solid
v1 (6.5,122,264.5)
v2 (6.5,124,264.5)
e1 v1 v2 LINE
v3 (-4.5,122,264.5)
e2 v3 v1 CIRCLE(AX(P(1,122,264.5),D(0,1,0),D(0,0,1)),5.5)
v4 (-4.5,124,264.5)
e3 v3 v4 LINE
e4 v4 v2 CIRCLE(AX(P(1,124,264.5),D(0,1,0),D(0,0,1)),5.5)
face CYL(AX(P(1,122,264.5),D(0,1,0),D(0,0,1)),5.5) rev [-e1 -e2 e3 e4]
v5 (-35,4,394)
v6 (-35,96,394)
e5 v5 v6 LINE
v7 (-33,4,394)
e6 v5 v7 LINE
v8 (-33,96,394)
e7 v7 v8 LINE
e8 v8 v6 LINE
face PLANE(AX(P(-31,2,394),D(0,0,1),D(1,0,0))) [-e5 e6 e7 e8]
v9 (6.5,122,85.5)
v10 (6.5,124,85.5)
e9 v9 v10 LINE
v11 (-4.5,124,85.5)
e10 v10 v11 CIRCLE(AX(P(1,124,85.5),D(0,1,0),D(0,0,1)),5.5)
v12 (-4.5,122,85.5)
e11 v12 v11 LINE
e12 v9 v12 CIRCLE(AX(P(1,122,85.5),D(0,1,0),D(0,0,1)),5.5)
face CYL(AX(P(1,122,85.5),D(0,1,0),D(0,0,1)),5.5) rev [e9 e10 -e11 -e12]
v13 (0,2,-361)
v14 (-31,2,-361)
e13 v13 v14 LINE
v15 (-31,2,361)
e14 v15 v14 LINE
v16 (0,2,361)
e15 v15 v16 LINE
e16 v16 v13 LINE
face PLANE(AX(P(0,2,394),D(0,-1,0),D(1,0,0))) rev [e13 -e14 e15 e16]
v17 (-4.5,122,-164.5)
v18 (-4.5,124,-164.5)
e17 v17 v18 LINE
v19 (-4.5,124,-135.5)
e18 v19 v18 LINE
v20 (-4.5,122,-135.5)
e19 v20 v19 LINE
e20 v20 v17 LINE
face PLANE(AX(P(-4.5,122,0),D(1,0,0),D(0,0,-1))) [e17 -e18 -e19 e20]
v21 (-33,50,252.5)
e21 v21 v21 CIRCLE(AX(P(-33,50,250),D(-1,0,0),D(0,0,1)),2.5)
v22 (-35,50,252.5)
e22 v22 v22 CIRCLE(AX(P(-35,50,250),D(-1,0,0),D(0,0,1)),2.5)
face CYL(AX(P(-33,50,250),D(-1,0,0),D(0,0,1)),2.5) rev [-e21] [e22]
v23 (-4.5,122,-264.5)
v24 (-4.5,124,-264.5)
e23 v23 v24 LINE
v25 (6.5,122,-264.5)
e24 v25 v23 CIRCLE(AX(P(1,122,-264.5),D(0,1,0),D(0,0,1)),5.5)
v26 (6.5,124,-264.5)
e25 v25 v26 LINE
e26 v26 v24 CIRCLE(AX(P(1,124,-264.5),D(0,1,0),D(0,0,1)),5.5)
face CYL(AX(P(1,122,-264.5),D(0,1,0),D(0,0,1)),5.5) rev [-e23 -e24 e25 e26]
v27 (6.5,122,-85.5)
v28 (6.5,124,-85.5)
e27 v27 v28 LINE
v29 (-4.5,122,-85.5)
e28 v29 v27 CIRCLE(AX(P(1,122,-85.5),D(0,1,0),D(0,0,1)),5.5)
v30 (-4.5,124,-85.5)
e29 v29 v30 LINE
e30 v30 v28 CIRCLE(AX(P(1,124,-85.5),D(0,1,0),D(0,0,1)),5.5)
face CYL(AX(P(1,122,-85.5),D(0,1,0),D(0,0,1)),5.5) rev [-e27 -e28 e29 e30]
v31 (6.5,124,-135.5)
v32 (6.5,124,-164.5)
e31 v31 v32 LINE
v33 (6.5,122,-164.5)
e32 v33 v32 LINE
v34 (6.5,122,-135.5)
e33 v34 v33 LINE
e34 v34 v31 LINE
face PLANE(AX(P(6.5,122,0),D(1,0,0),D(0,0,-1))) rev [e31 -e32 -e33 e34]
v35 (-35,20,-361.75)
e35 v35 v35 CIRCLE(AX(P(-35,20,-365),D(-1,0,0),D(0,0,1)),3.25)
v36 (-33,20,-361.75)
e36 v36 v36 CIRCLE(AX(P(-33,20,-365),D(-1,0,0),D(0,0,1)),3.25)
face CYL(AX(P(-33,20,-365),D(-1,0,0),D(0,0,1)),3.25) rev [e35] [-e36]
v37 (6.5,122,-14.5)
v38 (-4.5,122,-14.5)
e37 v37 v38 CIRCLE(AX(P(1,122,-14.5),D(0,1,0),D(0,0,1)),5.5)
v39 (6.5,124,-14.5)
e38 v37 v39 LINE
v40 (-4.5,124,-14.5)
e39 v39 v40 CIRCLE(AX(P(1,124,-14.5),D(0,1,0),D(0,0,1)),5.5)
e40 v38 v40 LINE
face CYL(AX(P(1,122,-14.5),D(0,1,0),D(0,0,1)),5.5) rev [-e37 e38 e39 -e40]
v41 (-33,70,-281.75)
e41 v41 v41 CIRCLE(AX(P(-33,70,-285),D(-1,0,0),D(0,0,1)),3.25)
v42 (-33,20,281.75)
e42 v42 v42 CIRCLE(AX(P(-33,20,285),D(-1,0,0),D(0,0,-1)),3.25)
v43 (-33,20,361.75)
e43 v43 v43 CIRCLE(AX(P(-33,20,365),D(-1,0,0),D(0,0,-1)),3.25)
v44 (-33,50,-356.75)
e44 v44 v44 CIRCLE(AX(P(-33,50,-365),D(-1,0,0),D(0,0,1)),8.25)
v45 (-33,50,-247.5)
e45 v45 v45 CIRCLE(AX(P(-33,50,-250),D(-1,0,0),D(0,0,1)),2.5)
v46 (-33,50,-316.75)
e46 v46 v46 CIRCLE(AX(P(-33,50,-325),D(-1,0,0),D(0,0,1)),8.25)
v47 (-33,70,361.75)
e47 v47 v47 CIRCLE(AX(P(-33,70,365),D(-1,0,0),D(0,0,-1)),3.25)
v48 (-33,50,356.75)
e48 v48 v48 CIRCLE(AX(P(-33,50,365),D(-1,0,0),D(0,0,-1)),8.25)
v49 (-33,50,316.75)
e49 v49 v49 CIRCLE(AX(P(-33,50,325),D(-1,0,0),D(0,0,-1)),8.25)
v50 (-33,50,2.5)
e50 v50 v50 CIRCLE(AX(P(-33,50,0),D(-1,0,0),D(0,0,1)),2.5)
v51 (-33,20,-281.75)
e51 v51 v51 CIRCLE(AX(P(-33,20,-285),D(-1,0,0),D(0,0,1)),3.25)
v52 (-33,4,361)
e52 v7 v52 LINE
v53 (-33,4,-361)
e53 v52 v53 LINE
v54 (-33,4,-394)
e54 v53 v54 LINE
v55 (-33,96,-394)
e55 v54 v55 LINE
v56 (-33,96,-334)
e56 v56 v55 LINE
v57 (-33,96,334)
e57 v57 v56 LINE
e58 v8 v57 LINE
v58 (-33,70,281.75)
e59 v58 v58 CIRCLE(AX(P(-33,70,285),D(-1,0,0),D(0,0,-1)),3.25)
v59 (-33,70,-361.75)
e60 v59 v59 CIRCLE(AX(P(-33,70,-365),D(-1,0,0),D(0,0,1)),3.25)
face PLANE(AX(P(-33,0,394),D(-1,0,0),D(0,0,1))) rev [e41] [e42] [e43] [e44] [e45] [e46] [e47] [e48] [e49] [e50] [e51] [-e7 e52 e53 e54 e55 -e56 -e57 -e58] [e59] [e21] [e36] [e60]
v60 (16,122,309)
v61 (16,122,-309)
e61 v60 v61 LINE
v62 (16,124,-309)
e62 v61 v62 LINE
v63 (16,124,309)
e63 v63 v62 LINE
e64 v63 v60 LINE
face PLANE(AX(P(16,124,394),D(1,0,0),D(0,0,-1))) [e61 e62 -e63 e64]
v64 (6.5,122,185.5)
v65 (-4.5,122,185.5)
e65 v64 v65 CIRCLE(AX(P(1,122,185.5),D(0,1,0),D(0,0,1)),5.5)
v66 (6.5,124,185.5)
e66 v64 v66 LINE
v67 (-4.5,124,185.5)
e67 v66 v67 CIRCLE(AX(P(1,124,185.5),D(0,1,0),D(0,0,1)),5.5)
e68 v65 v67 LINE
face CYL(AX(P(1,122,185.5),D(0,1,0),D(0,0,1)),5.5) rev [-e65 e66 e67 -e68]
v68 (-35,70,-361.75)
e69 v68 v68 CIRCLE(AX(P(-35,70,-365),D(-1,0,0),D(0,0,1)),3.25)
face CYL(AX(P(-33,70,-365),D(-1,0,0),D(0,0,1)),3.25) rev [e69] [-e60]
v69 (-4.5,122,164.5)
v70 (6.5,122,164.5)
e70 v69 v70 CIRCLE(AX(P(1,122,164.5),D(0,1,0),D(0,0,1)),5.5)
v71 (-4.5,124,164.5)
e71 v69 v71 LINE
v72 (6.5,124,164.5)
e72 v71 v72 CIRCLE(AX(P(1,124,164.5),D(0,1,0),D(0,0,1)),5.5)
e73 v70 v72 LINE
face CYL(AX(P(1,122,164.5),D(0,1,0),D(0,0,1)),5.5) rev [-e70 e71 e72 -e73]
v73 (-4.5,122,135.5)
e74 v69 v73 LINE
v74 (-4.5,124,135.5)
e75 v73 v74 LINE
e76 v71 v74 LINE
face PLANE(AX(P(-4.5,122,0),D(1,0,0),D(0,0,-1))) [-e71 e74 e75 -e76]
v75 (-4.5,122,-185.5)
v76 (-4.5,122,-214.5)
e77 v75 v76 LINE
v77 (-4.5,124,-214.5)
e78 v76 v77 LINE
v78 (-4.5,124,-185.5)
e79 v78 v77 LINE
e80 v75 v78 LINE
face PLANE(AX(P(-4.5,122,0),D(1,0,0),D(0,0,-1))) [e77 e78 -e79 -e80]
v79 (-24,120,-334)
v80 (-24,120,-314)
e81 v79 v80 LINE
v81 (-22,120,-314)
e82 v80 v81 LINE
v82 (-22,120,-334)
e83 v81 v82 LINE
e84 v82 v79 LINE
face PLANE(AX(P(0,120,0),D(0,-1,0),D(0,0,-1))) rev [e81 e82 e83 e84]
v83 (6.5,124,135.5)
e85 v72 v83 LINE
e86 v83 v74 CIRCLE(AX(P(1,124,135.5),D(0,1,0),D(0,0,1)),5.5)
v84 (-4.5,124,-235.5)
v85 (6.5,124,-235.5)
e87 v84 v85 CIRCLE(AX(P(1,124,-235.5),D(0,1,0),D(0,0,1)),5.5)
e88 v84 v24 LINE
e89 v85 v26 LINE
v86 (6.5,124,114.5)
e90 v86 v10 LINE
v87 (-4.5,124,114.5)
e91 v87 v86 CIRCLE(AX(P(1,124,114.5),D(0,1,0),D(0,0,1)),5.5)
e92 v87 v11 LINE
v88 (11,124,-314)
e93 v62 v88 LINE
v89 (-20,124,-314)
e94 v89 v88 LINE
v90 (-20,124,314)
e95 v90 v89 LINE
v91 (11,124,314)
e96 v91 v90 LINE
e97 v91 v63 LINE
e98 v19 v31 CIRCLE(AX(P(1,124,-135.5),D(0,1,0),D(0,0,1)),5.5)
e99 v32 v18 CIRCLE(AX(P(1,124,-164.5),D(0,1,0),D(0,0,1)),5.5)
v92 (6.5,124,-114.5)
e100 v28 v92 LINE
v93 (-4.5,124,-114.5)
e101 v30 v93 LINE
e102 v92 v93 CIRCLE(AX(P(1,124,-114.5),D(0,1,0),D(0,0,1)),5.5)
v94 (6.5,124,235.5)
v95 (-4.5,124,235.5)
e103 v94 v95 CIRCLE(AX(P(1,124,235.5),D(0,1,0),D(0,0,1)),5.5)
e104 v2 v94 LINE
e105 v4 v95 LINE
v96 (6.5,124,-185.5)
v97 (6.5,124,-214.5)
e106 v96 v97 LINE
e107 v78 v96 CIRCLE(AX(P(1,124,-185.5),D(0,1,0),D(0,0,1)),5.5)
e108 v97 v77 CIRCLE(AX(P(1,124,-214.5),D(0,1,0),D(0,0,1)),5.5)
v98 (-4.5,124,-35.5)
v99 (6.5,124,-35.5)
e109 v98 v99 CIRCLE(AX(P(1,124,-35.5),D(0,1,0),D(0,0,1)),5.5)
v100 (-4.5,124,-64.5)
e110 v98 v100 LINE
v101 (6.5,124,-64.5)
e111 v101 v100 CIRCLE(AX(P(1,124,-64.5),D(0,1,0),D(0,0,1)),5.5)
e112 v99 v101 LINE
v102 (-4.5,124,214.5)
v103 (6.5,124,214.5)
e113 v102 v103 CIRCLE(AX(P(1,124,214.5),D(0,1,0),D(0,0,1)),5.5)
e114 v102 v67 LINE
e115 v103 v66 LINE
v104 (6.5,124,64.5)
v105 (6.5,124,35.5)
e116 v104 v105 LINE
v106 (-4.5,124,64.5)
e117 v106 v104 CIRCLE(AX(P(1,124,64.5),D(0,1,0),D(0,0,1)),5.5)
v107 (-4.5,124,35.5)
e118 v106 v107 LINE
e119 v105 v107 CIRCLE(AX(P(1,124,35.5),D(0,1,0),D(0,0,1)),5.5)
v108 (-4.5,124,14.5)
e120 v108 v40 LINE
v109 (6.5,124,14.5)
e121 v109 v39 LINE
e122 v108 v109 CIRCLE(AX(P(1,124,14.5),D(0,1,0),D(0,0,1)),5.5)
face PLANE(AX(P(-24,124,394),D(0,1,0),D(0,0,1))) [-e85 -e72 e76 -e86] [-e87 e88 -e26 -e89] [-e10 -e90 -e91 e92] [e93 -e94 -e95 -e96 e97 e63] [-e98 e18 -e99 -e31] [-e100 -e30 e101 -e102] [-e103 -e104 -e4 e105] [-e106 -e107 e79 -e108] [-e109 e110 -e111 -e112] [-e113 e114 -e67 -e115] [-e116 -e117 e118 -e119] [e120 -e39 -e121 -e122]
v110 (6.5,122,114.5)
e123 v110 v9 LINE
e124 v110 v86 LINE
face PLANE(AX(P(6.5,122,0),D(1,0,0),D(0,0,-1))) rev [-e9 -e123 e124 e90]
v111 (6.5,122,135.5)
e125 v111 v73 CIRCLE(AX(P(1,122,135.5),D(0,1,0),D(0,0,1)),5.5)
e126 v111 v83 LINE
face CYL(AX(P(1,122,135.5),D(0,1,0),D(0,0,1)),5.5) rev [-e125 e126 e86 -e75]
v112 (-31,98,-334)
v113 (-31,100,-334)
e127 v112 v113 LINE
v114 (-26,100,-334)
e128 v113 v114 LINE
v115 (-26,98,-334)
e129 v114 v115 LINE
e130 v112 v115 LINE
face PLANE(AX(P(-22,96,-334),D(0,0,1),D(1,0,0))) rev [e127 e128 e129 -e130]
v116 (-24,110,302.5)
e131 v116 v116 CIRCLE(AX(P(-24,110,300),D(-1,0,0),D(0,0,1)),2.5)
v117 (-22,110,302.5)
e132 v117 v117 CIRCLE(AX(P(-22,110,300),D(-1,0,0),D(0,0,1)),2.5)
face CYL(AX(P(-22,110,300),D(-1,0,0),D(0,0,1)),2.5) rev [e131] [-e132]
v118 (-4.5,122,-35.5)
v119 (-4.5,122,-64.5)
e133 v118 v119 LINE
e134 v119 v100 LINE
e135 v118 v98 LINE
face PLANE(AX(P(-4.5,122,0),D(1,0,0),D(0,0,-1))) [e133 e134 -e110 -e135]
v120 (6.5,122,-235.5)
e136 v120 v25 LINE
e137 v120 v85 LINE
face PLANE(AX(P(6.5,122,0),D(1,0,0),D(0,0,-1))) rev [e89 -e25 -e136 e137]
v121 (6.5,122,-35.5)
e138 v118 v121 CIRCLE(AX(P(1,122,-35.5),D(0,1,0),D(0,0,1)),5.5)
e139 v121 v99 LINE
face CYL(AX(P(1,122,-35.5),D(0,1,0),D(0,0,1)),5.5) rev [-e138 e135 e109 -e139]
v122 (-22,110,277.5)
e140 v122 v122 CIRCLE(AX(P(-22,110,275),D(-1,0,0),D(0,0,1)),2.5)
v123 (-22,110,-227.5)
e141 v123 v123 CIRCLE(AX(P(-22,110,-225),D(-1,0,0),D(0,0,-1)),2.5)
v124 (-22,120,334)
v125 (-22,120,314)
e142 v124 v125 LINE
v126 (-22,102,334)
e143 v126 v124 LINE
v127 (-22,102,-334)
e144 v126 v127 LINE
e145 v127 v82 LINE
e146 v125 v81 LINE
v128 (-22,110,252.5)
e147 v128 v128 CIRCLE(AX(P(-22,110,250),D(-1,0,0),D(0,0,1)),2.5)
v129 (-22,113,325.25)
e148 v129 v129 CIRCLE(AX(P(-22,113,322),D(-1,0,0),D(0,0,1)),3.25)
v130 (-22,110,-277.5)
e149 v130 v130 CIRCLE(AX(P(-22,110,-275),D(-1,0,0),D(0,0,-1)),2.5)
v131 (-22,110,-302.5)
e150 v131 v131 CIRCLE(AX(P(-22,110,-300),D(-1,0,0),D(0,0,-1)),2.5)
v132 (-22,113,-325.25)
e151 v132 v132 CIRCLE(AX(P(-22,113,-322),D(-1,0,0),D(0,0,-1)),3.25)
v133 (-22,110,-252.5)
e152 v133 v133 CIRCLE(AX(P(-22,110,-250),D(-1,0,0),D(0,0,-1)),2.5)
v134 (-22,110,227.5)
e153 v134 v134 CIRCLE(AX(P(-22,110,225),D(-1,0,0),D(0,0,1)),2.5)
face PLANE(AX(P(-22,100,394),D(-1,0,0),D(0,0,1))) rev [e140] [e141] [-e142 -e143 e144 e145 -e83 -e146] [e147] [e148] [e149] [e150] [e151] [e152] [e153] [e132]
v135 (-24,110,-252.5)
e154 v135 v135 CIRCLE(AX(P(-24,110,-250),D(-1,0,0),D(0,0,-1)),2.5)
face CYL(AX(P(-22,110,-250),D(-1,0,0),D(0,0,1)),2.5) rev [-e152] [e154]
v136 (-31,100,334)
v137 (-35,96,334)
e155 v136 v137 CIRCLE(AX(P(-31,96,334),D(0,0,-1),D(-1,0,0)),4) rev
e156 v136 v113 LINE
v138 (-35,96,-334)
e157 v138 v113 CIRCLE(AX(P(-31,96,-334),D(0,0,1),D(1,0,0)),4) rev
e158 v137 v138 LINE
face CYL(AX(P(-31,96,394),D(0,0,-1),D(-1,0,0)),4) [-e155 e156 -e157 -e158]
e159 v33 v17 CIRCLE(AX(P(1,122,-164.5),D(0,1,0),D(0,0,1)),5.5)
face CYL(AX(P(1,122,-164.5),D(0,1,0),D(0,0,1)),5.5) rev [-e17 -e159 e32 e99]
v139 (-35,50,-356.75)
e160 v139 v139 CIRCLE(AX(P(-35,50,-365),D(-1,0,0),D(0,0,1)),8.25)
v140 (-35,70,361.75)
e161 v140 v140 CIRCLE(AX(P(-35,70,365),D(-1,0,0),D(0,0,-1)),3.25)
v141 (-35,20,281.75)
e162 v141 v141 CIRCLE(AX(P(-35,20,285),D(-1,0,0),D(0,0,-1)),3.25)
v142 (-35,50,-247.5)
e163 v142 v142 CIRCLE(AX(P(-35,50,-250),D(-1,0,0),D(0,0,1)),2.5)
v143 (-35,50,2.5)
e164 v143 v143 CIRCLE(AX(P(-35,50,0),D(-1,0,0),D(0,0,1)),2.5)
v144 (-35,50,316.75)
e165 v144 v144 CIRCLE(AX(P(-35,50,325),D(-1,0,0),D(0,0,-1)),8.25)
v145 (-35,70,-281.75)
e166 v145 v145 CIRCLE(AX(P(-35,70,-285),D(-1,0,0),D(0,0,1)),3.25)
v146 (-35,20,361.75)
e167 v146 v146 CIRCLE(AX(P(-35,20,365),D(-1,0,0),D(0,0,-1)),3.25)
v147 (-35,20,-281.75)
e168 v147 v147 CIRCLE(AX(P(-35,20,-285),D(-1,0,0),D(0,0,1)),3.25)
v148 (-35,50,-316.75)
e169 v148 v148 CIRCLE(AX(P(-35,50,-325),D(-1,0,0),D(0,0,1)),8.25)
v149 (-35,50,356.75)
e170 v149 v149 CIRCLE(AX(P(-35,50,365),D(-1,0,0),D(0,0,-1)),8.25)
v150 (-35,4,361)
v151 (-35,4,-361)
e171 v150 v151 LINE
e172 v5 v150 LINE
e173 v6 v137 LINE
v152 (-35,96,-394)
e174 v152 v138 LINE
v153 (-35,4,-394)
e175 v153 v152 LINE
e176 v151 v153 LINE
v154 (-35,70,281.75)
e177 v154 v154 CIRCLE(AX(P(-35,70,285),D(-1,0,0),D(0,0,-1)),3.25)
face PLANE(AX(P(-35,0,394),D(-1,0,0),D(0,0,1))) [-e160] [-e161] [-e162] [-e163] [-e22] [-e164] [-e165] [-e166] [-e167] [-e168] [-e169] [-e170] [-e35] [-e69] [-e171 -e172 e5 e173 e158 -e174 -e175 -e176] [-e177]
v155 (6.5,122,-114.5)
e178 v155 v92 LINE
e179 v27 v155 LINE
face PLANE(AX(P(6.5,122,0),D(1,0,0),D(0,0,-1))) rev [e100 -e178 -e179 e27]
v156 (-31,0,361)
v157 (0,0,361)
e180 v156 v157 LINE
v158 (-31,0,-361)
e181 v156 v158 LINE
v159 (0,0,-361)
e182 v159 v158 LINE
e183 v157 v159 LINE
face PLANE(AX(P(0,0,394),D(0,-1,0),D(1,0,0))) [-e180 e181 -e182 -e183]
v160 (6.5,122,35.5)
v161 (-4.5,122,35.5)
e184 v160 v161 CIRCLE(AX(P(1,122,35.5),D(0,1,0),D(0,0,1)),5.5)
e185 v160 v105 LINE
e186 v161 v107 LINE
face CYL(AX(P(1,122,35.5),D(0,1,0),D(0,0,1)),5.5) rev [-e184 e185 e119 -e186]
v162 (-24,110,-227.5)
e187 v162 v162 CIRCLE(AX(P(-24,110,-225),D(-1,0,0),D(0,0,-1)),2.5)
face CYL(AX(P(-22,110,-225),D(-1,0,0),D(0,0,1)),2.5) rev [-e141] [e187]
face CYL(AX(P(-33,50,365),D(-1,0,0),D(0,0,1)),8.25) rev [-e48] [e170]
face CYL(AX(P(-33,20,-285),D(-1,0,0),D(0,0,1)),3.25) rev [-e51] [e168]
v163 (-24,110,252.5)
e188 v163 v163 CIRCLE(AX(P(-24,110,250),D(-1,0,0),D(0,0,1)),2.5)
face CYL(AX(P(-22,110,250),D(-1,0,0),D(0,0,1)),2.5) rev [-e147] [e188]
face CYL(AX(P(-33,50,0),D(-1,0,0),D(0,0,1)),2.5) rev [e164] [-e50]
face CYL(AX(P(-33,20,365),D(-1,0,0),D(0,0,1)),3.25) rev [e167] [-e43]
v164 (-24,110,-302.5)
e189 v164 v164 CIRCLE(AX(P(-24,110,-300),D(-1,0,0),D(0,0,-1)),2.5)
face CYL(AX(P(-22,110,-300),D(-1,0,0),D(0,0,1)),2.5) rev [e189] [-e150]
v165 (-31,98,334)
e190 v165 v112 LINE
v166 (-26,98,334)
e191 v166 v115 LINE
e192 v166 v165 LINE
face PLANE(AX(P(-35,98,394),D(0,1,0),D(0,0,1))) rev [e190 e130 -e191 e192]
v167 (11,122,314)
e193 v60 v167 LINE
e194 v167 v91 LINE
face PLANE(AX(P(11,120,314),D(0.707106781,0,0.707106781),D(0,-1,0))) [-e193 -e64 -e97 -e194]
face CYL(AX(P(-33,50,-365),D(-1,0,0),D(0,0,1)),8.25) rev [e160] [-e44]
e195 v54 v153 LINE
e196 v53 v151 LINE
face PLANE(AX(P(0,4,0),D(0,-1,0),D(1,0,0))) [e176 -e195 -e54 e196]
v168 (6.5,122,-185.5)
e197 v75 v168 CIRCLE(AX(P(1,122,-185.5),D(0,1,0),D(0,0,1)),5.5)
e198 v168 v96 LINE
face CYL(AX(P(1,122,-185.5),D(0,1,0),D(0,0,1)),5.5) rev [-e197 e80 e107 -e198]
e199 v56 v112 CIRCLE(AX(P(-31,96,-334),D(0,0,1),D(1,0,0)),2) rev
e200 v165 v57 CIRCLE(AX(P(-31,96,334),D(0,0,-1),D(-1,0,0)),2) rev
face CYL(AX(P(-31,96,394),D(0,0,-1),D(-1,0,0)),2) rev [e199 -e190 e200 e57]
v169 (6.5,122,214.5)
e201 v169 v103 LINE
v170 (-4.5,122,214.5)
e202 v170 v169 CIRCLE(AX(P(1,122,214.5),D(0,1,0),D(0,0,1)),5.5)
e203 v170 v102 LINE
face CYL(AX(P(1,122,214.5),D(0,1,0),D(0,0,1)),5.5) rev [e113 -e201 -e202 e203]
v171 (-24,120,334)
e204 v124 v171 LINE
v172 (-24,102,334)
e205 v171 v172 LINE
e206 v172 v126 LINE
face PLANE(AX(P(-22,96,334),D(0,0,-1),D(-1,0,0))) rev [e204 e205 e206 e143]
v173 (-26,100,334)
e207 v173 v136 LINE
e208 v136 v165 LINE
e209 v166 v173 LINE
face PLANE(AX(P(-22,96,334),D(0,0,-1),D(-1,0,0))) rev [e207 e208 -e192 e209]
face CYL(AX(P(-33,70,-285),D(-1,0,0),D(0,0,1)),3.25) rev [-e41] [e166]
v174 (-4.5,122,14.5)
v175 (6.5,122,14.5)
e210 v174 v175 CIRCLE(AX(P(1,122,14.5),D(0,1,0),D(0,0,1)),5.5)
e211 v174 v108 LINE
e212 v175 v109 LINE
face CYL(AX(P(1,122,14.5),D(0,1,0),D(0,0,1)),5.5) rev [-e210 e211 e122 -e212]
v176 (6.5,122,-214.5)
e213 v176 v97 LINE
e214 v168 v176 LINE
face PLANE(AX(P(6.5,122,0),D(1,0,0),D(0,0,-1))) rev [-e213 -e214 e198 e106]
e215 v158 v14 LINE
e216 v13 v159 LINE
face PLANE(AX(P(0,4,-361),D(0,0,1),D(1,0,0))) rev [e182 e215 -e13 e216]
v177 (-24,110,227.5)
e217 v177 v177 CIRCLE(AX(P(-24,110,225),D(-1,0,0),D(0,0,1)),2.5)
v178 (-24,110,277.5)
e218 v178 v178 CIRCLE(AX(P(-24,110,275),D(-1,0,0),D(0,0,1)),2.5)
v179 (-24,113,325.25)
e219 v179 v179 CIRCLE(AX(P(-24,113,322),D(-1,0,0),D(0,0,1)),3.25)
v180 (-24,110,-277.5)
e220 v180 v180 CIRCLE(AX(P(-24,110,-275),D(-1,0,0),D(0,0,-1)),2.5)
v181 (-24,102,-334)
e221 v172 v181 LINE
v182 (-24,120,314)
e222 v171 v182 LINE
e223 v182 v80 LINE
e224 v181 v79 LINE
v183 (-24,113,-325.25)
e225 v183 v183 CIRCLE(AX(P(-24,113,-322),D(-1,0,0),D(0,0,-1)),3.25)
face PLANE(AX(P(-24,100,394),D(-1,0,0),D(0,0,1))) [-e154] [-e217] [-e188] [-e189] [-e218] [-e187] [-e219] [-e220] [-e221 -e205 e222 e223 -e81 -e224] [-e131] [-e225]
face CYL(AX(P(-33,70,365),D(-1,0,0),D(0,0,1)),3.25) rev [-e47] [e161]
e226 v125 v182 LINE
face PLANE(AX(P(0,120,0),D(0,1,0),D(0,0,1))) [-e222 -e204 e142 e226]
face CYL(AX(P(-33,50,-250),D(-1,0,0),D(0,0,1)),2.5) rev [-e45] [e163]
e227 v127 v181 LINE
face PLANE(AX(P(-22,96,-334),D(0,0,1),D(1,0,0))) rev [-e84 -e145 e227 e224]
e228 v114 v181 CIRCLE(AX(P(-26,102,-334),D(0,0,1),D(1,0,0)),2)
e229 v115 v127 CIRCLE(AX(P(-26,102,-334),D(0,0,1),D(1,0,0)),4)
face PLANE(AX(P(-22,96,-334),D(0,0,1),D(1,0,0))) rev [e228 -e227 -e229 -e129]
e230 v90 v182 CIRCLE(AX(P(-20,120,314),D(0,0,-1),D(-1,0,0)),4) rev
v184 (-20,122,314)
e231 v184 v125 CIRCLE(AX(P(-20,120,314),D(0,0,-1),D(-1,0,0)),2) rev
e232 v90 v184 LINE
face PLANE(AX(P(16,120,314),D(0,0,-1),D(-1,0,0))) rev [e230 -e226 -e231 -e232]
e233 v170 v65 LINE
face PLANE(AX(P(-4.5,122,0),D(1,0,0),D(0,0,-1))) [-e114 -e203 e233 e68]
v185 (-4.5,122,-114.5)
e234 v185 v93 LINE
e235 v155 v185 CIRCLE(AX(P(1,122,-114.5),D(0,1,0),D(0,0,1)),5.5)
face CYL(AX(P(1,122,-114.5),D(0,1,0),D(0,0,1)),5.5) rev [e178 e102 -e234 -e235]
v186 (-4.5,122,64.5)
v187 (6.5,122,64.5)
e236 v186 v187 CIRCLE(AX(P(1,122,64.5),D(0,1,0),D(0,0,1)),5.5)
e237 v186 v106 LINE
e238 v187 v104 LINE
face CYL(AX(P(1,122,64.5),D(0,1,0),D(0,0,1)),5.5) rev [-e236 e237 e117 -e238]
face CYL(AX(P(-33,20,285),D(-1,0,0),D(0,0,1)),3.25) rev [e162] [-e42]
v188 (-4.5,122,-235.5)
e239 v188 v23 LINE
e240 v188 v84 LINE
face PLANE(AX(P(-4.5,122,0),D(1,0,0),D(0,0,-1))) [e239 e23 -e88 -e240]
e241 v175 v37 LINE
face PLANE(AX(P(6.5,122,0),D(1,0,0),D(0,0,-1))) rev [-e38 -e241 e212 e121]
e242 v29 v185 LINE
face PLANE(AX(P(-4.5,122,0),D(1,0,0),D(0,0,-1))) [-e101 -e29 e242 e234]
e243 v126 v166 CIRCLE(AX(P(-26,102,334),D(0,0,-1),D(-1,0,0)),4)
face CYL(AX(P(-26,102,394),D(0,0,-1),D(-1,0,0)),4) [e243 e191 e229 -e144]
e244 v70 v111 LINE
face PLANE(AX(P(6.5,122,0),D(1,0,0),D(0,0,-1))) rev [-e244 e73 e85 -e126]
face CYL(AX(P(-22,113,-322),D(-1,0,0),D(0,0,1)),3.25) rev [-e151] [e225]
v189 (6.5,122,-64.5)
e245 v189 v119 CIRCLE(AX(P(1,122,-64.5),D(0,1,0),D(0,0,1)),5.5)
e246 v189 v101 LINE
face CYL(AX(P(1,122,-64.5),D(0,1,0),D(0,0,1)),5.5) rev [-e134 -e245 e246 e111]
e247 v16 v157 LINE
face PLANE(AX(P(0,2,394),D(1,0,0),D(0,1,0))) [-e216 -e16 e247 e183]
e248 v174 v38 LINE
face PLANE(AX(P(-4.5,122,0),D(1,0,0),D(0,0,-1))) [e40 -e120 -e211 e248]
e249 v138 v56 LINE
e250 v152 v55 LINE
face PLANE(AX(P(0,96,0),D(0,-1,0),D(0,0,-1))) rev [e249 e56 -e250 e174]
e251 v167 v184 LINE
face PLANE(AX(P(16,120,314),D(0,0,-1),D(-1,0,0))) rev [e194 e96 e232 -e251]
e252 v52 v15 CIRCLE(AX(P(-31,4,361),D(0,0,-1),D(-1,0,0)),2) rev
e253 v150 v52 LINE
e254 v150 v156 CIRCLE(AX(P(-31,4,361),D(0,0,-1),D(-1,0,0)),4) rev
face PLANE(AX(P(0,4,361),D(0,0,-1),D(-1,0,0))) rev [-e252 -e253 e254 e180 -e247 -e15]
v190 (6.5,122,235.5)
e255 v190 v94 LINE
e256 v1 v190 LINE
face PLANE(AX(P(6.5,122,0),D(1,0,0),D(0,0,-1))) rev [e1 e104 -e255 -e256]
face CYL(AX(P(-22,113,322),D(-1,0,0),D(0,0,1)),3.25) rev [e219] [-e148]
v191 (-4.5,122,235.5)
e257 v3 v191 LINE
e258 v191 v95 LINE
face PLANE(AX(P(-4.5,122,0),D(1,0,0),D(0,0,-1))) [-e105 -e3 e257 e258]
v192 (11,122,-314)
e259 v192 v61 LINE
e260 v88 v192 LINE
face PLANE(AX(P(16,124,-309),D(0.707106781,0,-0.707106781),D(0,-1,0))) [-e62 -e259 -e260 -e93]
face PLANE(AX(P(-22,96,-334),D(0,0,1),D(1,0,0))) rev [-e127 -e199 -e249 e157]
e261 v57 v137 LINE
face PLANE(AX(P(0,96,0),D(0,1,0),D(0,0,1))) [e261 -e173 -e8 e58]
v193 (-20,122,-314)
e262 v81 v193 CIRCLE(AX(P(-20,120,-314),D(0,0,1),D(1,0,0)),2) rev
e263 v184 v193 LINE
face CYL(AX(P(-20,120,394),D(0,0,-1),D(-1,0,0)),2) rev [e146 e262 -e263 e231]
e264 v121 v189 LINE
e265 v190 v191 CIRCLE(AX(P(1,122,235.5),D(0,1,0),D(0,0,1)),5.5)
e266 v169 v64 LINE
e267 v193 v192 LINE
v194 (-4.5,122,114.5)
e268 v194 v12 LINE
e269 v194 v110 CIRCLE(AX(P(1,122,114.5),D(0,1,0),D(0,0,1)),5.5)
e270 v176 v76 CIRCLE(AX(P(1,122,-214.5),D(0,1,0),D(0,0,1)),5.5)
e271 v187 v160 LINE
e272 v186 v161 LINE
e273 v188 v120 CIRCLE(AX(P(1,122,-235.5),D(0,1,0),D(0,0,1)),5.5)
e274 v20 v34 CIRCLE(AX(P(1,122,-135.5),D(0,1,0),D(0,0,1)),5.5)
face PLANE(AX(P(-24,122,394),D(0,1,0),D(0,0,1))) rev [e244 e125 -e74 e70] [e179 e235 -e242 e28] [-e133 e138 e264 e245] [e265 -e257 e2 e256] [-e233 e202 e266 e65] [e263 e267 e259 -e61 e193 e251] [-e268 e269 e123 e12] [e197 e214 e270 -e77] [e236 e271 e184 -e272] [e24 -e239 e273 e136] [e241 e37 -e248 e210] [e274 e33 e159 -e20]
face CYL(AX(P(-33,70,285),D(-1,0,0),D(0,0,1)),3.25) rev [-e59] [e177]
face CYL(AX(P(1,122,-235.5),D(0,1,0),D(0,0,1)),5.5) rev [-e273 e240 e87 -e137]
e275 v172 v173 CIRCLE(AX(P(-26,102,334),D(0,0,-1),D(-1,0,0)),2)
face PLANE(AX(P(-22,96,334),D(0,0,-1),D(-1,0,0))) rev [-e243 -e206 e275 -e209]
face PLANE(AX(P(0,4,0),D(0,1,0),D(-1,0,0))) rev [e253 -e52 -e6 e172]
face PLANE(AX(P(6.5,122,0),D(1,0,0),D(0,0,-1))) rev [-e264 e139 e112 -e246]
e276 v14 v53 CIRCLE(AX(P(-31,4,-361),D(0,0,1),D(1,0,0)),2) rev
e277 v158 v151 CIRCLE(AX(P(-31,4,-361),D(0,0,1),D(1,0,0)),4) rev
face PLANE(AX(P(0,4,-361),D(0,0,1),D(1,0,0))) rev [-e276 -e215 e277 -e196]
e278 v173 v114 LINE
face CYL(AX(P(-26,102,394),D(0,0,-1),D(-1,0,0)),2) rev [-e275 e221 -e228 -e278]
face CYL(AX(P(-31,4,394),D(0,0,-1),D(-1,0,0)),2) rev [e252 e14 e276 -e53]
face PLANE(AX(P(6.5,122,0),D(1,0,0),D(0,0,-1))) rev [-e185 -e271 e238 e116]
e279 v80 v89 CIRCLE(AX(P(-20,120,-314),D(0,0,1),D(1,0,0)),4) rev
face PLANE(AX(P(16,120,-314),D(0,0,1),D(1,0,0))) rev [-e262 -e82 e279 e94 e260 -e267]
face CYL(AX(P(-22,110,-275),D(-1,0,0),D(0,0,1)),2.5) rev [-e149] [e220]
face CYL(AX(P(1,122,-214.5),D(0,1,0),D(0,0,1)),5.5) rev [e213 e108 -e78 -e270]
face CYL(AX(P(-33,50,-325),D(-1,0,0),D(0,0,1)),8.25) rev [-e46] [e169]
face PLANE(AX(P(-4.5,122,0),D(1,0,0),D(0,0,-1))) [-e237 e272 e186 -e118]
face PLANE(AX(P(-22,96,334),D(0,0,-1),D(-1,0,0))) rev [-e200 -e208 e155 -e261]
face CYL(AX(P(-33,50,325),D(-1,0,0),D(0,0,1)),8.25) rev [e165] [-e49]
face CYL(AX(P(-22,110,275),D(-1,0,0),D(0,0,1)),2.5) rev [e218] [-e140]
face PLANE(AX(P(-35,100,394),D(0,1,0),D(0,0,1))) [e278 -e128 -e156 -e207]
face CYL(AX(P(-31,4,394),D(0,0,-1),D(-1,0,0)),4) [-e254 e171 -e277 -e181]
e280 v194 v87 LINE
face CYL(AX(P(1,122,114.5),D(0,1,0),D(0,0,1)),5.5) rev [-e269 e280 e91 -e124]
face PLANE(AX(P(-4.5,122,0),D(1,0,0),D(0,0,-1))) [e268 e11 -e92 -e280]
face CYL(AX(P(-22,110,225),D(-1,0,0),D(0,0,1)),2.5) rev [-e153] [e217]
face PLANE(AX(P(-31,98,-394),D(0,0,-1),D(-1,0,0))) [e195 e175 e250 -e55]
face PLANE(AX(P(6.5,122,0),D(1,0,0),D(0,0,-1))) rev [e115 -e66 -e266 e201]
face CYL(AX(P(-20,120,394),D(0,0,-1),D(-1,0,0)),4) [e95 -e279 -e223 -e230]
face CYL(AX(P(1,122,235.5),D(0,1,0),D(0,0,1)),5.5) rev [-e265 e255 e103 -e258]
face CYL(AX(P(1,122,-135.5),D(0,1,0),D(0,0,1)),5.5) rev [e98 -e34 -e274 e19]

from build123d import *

# Parameters (mm, degrees)
SM_BASE_FLANGE_1_DEPTH = 394
SKETCH_6_W             = 40
SKETCH_6_H             = 80
CUT_EXTRUDE_1_DEPTH    = 4
SKETCH_8_W             = 13
SKETCH_8_H             = 60
CUT_EXTRUDE_2_DEPTH    = 24
SKETCH_9_W             = 35
SKETCH_9_H             = 33
CUT_EXTRUDE_3_DEPTH    = 4
SKETCH_10_R            = 8.25
SKETCH_10_R_2          = 3.25
SKETCH_10_R_3          = 2.5
CUT_EXTRUDE_4_DEPTH    = 10
SKETCH_11_R            = 2.5
SKETCH_11_R_2          = 3.25
CUT_EXTRUDE_5_DEPTH    = 10
CUT_EXTRUDE_6_DEPTH    = 10
OTHER_START            = 229.809703886
OTHER_1_OUTLINE_W      = 445.809703886
OTHER_1_OUTLINE_H      = 4
OTHER_1_DEPTH          = 3.535533906
OTHER_START_2          = -214.2533547
OTHER_1_2_OUTLINE_W    = 4.190296114
OTHER_1_2_OUTLINE_H    = 4
OTHER_1_2_DEPTH        = 7.071067812


# Read off the part's stored shape, not the designer's step: Затупленный угол1
# Sheet-metal steps are written as plain solids
with BuildPart() as part:
    # Sketch 1 → Sm Base Flange 1 (new, symmetric)
    with BuildSketch(Plane.XY):
        with BuildLine():
            Line((0, 0), (-31, 0))
            ThreePointArc((-31, 0), (-33.828427125, 1.171572875), (-35, 4))
            Line((-35, 4), (-35, 96))
            ThreePointArc((-35, 96), (-33.828427125, 98.828427125), (-31, 100))
            Line((-31, 100), (-26, 100))
            ThreePointArc((-26, 100), (-24.585786438, 100.585786438), (-24, 102))
            Line((-24, 102), (-24, 120))
            ThreePointArc((-24, 120), (-22.828427125, 122.828427125), (-20, 124))
            Line((-20, 124), (16, 124))
            Line((16, 124), (16, 122))
            Line((16, 122), (-20, 122))
            ThreePointArc((-20, 122), (-21.414213562, 121.414213562), (-22, 120))
            Line((-22, 120), (-22, 102))
            ThreePointArc((-22, 102), (-23.171572875, 99.171572875), (-26, 98))
            Line((-26, 98), (-31, 98))
            ThreePointArc((-31, 98), (-32.414213562, 97.414213562), (-33, 96))
            Line((-33, 96), (-33, 4))
            ThreePointArc((-33, 4), (-32.414213562, 2.585786438), (-31, 2))
            Line((-31, 2), (0, 2))
            Line((0, 2), (0, 0))
        make_face()
    extrude(amount=SM_BASE_FLANGE_1_DEPTH, both=True)

    # Эскиз6 → Вырез-Вытянуть1 (cut)
    with BuildSketch(Plane(origin=(0, 124, 0), x_dir=(1, 0, 0), z_dir=(0, 1, 0))):
        with Locations((-4, -354)):
            Rectangle(SKETCH_6_W, SKETCH_6_H)
        with Locations((-4, 354)):
            Rectangle(SKETCH_6_W, SKETCH_6_H)
    extrude(amount=-CUT_EXTRUDE_1_DEPTH, mode=Mode.SUBTRACT)

    # Эскиз8 → Вырез-Вытянуть2 (cut)
    with BuildSketch(Plane(origin=(0, 120, 0), x_dir=(1, 0, 0), z_dir=(0, 1, 0))):
        with Locations((-28.5, 364)):
            Rectangle(SKETCH_8_W, SKETCH_8_H)
        with Locations((-28.5, -364)):
            Rectangle(SKETCH_8_W, SKETCH_8_H)
    extrude(amount=-CUT_EXTRUDE_2_DEPTH, mode=Mode.SUBTRACT)

    # Эскиз9 → Вырез-Вытянуть3 (cut)
    with BuildSketch(Plane.XZ):
        with Locations((-17.5, -377.5)):
            Rectangle(SKETCH_9_W, SKETCH_9_H)
        with Locations((-17.5, 377.5)):
            Rectangle(SKETCH_9_W, SKETCH_9_H)
    extrude(amount=-CUT_EXTRUDE_3_DEPTH, mode=Mode.SUBTRACT)

    # Эскиз10 → Вырез-Вытянуть4 (cut)
    with BuildSketch(Plane.ZY.offset(35)):
        with Locations((-365, 50)):
            Circle(SKETCH_10_R)
        with Locations((-365, 20)):
            Circle(SKETCH_10_R_2)
        with Locations((-365, 70)):
            Circle(SKETCH_10_R_2)
        with Locations((-285, 20)):
            Circle(SKETCH_10_R_2)
        with Locations((-285, 70)):
            Circle(SKETCH_10_R_2)
        with Locations((-325, 50)):
            Circle(SKETCH_10_R)
        with Locations(Location((325, 50, 0), (0, 0, 180))):
            Circle(SKETCH_10_R)
        with Locations(Location((285, 70, 0), (0, 0, 180))):
            Circle(SKETCH_10_R_2)
        with Locations(Location((285, 20, 0), (0, 0, 180))):
            Circle(SKETCH_10_R_2)
        with Locations(Location((365, 70, 0), (0, 0, 180))):
            Circle(SKETCH_10_R_2)
        with Locations(Location((365, 20, 0), (0, 0, 180))):
            Circle(SKETCH_10_R_2)
        with Locations(Location((365, 50, 0), (0, 0, 180))):
            Circle(SKETCH_10_R)
        with Locations((-250, 50)):
            Circle(SKETCH_10_R_3)
        with Locations((0, 50)):
            Circle(SKETCH_10_R_3)
        with Locations((250, 50)):
            Circle(SKETCH_10_R_3)
    extrude(amount=-CUT_EXTRUDE_4_DEPTH, mode=Mode.SUBTRACT)

    # Эскиз11 → Вырез-Вытянуть5 (cut)
    with BuildSketch(Plane.ZY.offset(24)):
        with Locations((300, 110)):
            Circle(SKETCH_11_R)
        with Locations((275, 110)):
            Circle(SKETCH_11_R)
        with Locations((250, 110)):
            Circle(SKETCH_11_R)
        with Locations((225, 110)):
            Circle(SKETCH_11_R)
        with Locations((322, 113)):
            Circle(SKETCH_11_R_2)
        with Locations(Location((-322, 113, 0), (0, 0, 180))):
            Circle(SKETCH_11_R_2)
        with Locations(Location((-225, 110, 0), (0, 0, 180))):
            Circle(SKETCH_11_R)
        with Locations(Location((-250, 110, 0), (0, 0, 180))):
            Circle(SKETCH_11_R)
        with Locations(Location((-275, 110, 0), (0, 0, 180))):
            Circle(SKETCH_11_R)
        with Locations(Location((-300, 110, 0), (0, 0, 180))):
            Circle(SKETCH_11_R)
    extrude(amount=-CUT_EXTRUDE_5_DEPTH, mode=Mode.SUBTRACT)

    # Эскиз12 → Вырез-Вытянуть6 (cut)
    with BuildSketch(Plane(origin=(0, 124, 0), x_dir=(1, 0, 0), z_dir=(0, 1, 0))):
        with BuildLine():
            Line((-4.5, 235.5), (-4.5, 264.5))
            ThreePointArc((-4.5, 264.5), (1, 270), (6.5, 264.5))
            Line((6.5, 264.5), (6.5, 235.5))
            ThreePointArc((6.5, 235.5), (1, 230), (-4.5, 235.5))
        make_face()
        with BuildLine():
            Line((-4.5, -14.5), (-4.5, 14.5))
            ThreePointArc((-4.5, 14.5), (1, 20), (6.5, 14.5))
            Line((6.5, 14.5), (6.5, -14.5))
            ThreePointArc((6.5, -14.5), (1, -20), (-4.5, -14.5))
        make_face()
        with BuildLine():
            Line((-4.5, 35.5), (-4.5, 64.5))
            ThreePointArc((-4.5, 64.5), (1, 70), (6.5, 64.5))
            Line((6.5, 64.5), (6.5, 35.5))
            ThreePointArc((6.5, 35.5), (1, 30), (-4.5, 35.5))
        make_face()
        with BuildLine():
            Line((-4.5, 85.5), (-4.5, 114.5))
            ThreePointArc((-4.5, 114.5), (1, 120), (6.5, 114.5))
            Line((6.5, 114.5), (6.5, 85.5))
            ThreePointArc((6.5, 85.5), (1, 80), (-4.5, 85.5))
        make_face()
        with BuildLine():
            Line((-4.5, 135.5), (-4.5, 164.5))
            ThreePointArc((-4.5, 164.5), (1, 170), (6.5, 164.5))
            Line((6.5, 164.5), (6.5, 135.5))
            ThreePointArc((6.5, 135.5), (1, 130), (-4.5, 135.5))
        make_face()
        with BuildLine():
            Line((-4.5, 185.5), (-4.5, 214.5))
            ThreePointArc((-4.5, 214.5), (1, 220), (6.5, 214.5))
            Line((6.5, 214.5), (6.5, 185.5))
            ThreePointArc((6.5, 185.5), (1, 180), (-4.5, 185.5))
        make_face()
        with BuildLine():
            Line((-4.5, -64.5), (-4.5, -35.5))
            ThreePointArc((-4.5, -35.5), (1, -30), (6.5, -35.5))
            Line((6.5, -35.5), (6.5, -64.5))
            ThreePointArc((6.5, -64.5), (1, -70), (-4.5, -64.5))
        make_face()
        with BuildLine():
            Line((-4.5, -114.5), (-4.5, -85.5))
            ThreePointArc((-4.5, -85.5), (1, -80), (6.5, -85.5))
            Line((6.5, -85.5), (6.5, -114.5))
            ThreePointArc((6.5, -114.5), (1, -120), (-4.5, -114.5))
        make_face()
        with BuildLine():
            Line((-4.5, -164.5), (-4.5, -135.5))
            ThreePointArc((-4.5, -135.5), (1, -130), (6.5, -135.5))
            Line((6.5, -135.5), (6.5, -164.5))
            ThreePointArc((6.5, -164.5), (1, -170), (-4.5, -164.5))
        make_face()
        with BuildLine():
            Line((-4.5, -214.5), (-4.5, -185.5))
            ThreePointArc((-4.5, -185.5), (1, -180), (6.5, -185.5))
            Line((6.5, -185.5), (6.5, -214.5))
            ThreePointArc((6.5, -214.5), (1, -220), (-4.5, -214.5))
        make_face()
        with BuildLine():
            Line((-4.5, -264.5), (-4.5, -235.5))
            ThreePointArc((-4.5, -235.5), (1, -230), (6.5, -235.5))
            Line((6.5, -235.5), (6.5, -264.5))
            ThreePointArc((6.5, -264.5), (1, -270), (-4.5, -264.5))
        make_face()
    extrude(amount=-CUT_EXTRUDE_6_DEPTH, mode=Mode.SUBTRACT)

    # Other 1 outline → Other 1 (cut)
    with BuildSketch(Plane(origin=(0, 0, 0), x_dir=(0.707106781186546, 0, -0.707106781186549), z_dir=(0.707106781186549, 0, 0.707106781186546)).offset(OTHER_START)):
        with Locations((6.904851943, 123)):
            Rectangle(OTHER_1_OUTLINE_W, OTHER_1_OUTLINE_H)
    extrude(amount=OTHER_1_DEPTH, mode=Mode.SUBTRACT)

    # Other 1 2 outline → Other 1 2 (cut)
    with BuildSketch(Plane(origin=(0, 0, 0), x_dir=(0.707106781186546, 0, -0.707106781186549), z_dir=(0.707106781186549, 0, 0.707106781186546)).offset(OTHER_START_2)):
        with Locations((231.904851943, 123)):
            Rectangle(OTHER_1_2_OUTLINE_W, OTHER_1_2_OUTLINE_H)
    extrude(amount=OTHER_1_2_DEPTH, mode=Mode.SUBTRACT)


solid = part.part
